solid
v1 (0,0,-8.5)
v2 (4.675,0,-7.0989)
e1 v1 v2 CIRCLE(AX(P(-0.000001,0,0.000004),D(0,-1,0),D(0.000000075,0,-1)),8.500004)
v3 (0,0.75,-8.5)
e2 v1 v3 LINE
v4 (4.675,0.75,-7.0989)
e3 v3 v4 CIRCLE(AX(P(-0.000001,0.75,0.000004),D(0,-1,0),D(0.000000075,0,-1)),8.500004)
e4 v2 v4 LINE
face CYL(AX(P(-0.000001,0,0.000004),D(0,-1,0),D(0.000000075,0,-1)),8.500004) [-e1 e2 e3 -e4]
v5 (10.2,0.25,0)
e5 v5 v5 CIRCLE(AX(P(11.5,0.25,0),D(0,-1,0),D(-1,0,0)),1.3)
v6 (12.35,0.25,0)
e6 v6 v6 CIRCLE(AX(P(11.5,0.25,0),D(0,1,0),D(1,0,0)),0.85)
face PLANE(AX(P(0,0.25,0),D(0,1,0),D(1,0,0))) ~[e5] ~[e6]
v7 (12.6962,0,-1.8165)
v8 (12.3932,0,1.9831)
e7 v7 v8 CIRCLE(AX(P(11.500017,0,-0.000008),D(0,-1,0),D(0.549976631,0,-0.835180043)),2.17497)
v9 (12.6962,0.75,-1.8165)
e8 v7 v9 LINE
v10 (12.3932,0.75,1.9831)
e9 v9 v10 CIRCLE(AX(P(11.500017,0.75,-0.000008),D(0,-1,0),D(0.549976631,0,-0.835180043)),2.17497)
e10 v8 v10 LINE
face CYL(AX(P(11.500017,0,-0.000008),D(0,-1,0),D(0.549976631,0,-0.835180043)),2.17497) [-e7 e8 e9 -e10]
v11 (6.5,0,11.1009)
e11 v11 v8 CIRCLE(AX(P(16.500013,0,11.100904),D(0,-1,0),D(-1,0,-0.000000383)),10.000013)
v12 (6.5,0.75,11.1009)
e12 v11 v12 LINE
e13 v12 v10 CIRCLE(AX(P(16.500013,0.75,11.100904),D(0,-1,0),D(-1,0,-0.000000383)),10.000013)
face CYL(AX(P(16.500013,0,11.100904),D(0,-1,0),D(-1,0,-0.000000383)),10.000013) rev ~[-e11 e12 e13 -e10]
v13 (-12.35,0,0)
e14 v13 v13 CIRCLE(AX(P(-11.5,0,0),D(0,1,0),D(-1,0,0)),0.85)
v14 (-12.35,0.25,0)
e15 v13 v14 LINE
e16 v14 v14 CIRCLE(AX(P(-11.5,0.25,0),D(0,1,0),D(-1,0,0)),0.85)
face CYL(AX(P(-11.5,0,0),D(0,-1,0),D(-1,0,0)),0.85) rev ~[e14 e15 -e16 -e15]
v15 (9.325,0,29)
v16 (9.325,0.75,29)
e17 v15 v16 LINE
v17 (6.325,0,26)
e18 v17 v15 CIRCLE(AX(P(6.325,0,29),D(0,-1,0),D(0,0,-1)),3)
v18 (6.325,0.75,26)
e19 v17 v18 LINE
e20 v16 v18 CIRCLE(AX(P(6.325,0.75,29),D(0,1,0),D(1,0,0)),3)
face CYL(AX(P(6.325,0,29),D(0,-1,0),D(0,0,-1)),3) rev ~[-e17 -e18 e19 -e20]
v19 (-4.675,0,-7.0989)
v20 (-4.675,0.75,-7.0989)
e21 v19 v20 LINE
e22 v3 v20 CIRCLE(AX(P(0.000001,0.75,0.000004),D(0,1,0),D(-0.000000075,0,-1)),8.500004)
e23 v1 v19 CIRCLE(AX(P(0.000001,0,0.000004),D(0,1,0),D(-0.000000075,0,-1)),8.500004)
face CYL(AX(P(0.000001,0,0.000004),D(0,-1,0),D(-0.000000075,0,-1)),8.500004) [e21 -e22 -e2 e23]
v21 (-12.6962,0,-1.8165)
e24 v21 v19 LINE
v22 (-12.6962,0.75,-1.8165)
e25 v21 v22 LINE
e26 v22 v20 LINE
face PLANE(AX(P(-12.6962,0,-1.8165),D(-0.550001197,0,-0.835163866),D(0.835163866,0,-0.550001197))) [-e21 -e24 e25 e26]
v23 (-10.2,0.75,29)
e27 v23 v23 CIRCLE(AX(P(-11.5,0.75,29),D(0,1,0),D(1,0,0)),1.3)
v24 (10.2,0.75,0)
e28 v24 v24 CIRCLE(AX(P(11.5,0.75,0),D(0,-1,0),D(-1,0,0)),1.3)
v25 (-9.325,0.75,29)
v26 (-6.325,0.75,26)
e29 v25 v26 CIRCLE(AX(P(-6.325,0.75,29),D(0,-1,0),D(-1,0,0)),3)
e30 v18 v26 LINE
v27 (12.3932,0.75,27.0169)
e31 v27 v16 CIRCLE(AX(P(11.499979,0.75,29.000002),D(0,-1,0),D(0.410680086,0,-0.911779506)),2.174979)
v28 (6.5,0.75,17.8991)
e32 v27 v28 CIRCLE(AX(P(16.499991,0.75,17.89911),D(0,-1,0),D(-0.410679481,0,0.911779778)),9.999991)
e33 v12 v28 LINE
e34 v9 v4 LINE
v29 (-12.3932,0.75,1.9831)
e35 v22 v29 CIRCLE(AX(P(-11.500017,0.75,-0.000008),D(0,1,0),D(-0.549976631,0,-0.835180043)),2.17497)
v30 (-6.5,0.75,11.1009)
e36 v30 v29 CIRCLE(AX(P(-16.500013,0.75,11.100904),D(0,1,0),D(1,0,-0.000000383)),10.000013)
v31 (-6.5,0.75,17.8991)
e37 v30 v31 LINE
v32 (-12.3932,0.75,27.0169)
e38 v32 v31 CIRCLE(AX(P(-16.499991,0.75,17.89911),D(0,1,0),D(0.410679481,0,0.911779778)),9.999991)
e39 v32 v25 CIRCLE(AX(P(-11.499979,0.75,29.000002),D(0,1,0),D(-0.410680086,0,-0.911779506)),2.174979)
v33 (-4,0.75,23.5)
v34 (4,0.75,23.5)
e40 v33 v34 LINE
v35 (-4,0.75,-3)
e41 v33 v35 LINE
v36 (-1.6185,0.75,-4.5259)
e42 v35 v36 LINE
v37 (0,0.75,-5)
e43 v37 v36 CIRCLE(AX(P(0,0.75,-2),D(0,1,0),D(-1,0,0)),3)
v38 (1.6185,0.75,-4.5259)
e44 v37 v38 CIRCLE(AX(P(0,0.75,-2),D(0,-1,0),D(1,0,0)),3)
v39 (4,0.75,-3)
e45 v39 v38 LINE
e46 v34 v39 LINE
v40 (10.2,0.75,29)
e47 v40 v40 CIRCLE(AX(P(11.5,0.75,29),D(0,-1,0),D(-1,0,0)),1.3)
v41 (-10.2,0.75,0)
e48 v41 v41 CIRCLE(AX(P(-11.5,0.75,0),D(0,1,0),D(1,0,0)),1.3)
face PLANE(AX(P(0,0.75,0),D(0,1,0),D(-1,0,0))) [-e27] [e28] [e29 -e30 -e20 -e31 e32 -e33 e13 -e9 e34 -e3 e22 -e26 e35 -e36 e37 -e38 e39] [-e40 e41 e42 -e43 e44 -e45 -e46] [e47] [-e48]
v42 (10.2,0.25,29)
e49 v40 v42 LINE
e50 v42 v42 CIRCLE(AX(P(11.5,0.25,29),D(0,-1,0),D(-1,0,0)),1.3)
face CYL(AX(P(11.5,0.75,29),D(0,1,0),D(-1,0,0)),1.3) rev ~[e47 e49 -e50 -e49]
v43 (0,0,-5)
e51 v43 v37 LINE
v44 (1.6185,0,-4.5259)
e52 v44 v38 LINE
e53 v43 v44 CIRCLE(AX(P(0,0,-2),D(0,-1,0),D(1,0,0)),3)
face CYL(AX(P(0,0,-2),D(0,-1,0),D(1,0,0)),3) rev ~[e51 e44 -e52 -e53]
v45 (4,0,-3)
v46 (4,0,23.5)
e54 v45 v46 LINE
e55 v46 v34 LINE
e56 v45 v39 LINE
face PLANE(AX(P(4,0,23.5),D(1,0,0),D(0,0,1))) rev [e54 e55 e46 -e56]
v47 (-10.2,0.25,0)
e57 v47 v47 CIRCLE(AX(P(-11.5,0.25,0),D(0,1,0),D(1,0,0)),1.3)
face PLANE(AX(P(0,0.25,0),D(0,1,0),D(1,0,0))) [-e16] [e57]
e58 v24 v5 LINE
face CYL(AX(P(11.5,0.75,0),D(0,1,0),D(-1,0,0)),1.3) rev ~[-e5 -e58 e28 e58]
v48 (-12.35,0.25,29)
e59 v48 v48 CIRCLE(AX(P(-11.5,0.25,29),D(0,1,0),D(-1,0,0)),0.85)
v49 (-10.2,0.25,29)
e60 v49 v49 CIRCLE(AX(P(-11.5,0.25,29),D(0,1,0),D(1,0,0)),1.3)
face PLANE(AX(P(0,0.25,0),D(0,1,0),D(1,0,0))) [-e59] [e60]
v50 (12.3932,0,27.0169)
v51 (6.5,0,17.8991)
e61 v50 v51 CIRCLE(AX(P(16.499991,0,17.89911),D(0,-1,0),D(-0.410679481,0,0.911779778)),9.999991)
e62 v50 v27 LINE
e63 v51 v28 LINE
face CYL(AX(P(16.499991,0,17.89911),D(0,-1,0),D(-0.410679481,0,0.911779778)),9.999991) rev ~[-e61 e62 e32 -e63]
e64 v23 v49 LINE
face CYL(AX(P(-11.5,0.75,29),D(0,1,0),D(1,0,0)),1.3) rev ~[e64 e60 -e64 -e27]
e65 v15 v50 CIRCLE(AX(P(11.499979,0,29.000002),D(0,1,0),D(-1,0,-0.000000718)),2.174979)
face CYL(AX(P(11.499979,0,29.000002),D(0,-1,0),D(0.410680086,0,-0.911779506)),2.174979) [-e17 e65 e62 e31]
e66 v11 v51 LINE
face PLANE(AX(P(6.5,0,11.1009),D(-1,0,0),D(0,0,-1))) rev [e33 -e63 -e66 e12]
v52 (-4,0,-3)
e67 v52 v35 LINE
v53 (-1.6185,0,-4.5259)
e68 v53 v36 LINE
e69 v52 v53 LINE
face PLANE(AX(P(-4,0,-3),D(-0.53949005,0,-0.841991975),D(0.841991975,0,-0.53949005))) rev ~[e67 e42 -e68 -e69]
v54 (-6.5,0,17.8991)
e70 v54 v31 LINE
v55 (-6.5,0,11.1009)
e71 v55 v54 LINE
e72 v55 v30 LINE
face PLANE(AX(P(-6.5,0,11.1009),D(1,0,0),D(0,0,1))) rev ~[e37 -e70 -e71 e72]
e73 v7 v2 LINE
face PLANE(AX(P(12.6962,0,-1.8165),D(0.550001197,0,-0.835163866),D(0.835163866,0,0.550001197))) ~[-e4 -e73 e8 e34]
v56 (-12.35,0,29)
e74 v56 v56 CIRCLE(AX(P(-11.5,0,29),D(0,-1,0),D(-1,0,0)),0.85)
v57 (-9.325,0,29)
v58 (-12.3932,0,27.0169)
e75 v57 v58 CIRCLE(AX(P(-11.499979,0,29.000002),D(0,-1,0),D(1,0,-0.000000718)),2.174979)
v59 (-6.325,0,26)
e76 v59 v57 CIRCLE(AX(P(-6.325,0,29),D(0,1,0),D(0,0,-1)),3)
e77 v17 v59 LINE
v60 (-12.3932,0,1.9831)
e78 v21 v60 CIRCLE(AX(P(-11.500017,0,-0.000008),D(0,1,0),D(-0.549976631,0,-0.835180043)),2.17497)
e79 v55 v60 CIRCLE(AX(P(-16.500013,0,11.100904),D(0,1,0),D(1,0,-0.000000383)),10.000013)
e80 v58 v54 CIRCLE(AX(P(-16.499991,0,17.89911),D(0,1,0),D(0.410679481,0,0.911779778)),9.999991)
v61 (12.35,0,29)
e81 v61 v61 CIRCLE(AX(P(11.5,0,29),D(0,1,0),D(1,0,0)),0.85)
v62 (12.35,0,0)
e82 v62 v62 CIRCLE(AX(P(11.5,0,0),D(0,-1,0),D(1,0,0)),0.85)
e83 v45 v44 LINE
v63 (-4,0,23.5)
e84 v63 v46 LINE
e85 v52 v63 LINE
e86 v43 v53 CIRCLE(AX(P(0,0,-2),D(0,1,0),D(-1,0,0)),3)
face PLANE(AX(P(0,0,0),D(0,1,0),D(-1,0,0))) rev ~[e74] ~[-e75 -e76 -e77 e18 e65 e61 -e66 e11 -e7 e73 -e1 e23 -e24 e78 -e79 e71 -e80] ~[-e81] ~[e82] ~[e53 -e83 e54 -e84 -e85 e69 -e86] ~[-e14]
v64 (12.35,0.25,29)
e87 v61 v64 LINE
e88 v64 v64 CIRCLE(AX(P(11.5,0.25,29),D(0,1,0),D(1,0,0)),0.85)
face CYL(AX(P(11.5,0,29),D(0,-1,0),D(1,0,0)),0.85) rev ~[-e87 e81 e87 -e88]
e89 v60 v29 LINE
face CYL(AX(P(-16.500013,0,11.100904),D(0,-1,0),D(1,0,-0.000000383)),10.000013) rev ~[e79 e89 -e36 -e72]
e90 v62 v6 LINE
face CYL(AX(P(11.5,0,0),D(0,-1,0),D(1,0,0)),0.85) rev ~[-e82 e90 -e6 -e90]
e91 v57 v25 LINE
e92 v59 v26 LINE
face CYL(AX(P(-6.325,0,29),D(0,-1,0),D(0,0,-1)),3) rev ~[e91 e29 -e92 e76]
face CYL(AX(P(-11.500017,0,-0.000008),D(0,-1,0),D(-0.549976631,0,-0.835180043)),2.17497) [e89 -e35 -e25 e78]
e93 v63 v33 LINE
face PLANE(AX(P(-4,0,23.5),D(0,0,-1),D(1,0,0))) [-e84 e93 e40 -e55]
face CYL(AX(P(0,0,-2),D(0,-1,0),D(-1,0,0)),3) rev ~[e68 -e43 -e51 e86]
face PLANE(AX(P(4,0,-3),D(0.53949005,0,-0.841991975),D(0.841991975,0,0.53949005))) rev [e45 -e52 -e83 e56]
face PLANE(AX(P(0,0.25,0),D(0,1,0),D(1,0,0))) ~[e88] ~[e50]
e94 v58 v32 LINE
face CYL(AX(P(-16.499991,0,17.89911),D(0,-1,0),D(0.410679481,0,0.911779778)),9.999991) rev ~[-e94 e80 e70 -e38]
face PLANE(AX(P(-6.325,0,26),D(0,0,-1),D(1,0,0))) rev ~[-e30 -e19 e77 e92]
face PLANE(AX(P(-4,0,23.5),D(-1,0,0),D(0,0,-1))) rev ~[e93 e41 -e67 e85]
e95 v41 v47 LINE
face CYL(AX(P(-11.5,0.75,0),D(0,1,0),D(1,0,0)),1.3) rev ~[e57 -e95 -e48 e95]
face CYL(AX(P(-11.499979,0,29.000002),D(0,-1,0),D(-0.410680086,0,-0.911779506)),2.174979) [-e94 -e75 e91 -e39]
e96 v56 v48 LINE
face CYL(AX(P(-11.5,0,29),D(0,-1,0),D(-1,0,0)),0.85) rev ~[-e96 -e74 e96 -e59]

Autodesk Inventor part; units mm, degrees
ref_plane "YZ Plane" through (0, 0, 0) normal (1, 0, 0) x (0, 1, 0)
ref_plane "XZ Plane" through (0, 0, 0) normal (0, 1, 0) x (-1, 0, 0)
ref_plane "XY Plane" through (0, 0, 0) normal (0, 0, 1) x (1, 0, 0)
sketch "スケッチ1" plane through (0, 0, 0) normal (0, 1, 0) x (-1, 0, 0)
  circle A0 centre (11.5, 0) radius 0.85
  circle A1 centre (11.5, 29) radius 0.85
  line L0 (0, -11.6446) -> (0, 36.0381)
  arc A2 (12.3932, 27.0169) -> (9.325, 29) centre (11.5, 29) ccw
  arc A3 (12.6962, -1.8165) -> (12.3932, 1.9831) centre (11.5, 0) ccw
  circle A4 centre (0, 0) radius 5
  line L1 (4, 23.5) -> (4, -3)
  line L2 (4, -3) -> (1.6185, -4.5259)
  line L3 (12.6962, -1.8165) -> (4.675, -7.0989)
  arc A5 (0, -8.5) -> (4.675, -7.0989) centre (0, 0) ccw
  circle A6 centre (0, -2) radius 3
  line L4 (4, 23.5) -> (0, 23.5)
  line L5 (14.3325, 28.15) -> (9.1092, 28.15)
  line L6 (-4, 23.5) -> (-4, -3)
  line L7 (-4, -3) -> (-1.6185, -4.5259)
  line L8 (-4, 23.5) -> (0, 23.5)
  line L9 (6.5, 11.1009) -> (6.5, 17.8991)
  arc A7 (6.325, 26) -> (9.325, 29) centre (6.325, 29) ccw
  line L10 (6.325, 26) -> (0, 26)
  arc A8 (12.3932, 27.0169) -> (6.5, 17.8991) centre (16.5, 17.8991) ccw
  arc A9 (6.5, 11.1009) -> (12.3932, 1.9831) centre (16.5, 11.1009) ccw
  circle A10 centre (11.5, 0) radius 1.175
  circle A11 centre (11.5, 29) radius 1.175
  point P0 (0, 30.9357)
  point P1 (4, 3)
  point P2 (0, 26.5)
  point P3 (0, -5)
  point P4 (-1.6185, -4.5259)
  point P5 (0, 1)
  point P6 (-4, 3)
  point P7 (0, -5)
  point P8 (3.4728, -6.6475)
  point P9 (0, 5)
  point P10 (0, -5)
  point P11 (2.7322, -4.1875)
  point P12 (-4, -3)
  dimension "d7" = 10
  dimension "d2" = 29
  dimension "d18" = 8.5
  dimension "d24" = 1.7
  dimension "d25" = 2
  dimension "d39" = 8
  dimension "d41" = 2.5
  dimension "d43" = 2.5
  dimension "d44" = 10
  dimension "d45" = 23
  dimension "d47" = 3
  dimension "d48" = 2.35
  dimension "d49" = 1
  dimension "d50" = 1
extrude "押し出し1" add sketch "スケッチ1" along normal blind 0.75 contours L5 A11 | L5 A11 | A11 L5 A7 A2 | L5 A2 A8 L9 A9 A3 L3 A5 L0 A4 L1 L4 L10 A7 A11 | A4 L1 | A6 L2 A4 | A10
sketch "スケッチ2" plane through (0, 0.75, 0) normal (0, 1, 0) x (1, 0, 0)
  circle A0 centre (-11.5, 0) radius 1.3
  circle A1 centre (-11.5, 0) radius 0.85 projected
  circle A2 centre (-11.5, -29) radius 0.85 projected
  circle A3 centre (-11.5, -29) radius 0.85 projected
  circle A4 centre (-11.5, -29) radius 1.3
  point P0 (0, 0)
  dimension "d51" = 2.6
extrude "押し出し2" cut sketch "スケッチ2" against normal blind 0.5
mirror "ミラー2" about plane through (0, 0, 26) normal (1, 0, 0) of "押し出し1", "押し出し2"
properties part number "Skirt"
